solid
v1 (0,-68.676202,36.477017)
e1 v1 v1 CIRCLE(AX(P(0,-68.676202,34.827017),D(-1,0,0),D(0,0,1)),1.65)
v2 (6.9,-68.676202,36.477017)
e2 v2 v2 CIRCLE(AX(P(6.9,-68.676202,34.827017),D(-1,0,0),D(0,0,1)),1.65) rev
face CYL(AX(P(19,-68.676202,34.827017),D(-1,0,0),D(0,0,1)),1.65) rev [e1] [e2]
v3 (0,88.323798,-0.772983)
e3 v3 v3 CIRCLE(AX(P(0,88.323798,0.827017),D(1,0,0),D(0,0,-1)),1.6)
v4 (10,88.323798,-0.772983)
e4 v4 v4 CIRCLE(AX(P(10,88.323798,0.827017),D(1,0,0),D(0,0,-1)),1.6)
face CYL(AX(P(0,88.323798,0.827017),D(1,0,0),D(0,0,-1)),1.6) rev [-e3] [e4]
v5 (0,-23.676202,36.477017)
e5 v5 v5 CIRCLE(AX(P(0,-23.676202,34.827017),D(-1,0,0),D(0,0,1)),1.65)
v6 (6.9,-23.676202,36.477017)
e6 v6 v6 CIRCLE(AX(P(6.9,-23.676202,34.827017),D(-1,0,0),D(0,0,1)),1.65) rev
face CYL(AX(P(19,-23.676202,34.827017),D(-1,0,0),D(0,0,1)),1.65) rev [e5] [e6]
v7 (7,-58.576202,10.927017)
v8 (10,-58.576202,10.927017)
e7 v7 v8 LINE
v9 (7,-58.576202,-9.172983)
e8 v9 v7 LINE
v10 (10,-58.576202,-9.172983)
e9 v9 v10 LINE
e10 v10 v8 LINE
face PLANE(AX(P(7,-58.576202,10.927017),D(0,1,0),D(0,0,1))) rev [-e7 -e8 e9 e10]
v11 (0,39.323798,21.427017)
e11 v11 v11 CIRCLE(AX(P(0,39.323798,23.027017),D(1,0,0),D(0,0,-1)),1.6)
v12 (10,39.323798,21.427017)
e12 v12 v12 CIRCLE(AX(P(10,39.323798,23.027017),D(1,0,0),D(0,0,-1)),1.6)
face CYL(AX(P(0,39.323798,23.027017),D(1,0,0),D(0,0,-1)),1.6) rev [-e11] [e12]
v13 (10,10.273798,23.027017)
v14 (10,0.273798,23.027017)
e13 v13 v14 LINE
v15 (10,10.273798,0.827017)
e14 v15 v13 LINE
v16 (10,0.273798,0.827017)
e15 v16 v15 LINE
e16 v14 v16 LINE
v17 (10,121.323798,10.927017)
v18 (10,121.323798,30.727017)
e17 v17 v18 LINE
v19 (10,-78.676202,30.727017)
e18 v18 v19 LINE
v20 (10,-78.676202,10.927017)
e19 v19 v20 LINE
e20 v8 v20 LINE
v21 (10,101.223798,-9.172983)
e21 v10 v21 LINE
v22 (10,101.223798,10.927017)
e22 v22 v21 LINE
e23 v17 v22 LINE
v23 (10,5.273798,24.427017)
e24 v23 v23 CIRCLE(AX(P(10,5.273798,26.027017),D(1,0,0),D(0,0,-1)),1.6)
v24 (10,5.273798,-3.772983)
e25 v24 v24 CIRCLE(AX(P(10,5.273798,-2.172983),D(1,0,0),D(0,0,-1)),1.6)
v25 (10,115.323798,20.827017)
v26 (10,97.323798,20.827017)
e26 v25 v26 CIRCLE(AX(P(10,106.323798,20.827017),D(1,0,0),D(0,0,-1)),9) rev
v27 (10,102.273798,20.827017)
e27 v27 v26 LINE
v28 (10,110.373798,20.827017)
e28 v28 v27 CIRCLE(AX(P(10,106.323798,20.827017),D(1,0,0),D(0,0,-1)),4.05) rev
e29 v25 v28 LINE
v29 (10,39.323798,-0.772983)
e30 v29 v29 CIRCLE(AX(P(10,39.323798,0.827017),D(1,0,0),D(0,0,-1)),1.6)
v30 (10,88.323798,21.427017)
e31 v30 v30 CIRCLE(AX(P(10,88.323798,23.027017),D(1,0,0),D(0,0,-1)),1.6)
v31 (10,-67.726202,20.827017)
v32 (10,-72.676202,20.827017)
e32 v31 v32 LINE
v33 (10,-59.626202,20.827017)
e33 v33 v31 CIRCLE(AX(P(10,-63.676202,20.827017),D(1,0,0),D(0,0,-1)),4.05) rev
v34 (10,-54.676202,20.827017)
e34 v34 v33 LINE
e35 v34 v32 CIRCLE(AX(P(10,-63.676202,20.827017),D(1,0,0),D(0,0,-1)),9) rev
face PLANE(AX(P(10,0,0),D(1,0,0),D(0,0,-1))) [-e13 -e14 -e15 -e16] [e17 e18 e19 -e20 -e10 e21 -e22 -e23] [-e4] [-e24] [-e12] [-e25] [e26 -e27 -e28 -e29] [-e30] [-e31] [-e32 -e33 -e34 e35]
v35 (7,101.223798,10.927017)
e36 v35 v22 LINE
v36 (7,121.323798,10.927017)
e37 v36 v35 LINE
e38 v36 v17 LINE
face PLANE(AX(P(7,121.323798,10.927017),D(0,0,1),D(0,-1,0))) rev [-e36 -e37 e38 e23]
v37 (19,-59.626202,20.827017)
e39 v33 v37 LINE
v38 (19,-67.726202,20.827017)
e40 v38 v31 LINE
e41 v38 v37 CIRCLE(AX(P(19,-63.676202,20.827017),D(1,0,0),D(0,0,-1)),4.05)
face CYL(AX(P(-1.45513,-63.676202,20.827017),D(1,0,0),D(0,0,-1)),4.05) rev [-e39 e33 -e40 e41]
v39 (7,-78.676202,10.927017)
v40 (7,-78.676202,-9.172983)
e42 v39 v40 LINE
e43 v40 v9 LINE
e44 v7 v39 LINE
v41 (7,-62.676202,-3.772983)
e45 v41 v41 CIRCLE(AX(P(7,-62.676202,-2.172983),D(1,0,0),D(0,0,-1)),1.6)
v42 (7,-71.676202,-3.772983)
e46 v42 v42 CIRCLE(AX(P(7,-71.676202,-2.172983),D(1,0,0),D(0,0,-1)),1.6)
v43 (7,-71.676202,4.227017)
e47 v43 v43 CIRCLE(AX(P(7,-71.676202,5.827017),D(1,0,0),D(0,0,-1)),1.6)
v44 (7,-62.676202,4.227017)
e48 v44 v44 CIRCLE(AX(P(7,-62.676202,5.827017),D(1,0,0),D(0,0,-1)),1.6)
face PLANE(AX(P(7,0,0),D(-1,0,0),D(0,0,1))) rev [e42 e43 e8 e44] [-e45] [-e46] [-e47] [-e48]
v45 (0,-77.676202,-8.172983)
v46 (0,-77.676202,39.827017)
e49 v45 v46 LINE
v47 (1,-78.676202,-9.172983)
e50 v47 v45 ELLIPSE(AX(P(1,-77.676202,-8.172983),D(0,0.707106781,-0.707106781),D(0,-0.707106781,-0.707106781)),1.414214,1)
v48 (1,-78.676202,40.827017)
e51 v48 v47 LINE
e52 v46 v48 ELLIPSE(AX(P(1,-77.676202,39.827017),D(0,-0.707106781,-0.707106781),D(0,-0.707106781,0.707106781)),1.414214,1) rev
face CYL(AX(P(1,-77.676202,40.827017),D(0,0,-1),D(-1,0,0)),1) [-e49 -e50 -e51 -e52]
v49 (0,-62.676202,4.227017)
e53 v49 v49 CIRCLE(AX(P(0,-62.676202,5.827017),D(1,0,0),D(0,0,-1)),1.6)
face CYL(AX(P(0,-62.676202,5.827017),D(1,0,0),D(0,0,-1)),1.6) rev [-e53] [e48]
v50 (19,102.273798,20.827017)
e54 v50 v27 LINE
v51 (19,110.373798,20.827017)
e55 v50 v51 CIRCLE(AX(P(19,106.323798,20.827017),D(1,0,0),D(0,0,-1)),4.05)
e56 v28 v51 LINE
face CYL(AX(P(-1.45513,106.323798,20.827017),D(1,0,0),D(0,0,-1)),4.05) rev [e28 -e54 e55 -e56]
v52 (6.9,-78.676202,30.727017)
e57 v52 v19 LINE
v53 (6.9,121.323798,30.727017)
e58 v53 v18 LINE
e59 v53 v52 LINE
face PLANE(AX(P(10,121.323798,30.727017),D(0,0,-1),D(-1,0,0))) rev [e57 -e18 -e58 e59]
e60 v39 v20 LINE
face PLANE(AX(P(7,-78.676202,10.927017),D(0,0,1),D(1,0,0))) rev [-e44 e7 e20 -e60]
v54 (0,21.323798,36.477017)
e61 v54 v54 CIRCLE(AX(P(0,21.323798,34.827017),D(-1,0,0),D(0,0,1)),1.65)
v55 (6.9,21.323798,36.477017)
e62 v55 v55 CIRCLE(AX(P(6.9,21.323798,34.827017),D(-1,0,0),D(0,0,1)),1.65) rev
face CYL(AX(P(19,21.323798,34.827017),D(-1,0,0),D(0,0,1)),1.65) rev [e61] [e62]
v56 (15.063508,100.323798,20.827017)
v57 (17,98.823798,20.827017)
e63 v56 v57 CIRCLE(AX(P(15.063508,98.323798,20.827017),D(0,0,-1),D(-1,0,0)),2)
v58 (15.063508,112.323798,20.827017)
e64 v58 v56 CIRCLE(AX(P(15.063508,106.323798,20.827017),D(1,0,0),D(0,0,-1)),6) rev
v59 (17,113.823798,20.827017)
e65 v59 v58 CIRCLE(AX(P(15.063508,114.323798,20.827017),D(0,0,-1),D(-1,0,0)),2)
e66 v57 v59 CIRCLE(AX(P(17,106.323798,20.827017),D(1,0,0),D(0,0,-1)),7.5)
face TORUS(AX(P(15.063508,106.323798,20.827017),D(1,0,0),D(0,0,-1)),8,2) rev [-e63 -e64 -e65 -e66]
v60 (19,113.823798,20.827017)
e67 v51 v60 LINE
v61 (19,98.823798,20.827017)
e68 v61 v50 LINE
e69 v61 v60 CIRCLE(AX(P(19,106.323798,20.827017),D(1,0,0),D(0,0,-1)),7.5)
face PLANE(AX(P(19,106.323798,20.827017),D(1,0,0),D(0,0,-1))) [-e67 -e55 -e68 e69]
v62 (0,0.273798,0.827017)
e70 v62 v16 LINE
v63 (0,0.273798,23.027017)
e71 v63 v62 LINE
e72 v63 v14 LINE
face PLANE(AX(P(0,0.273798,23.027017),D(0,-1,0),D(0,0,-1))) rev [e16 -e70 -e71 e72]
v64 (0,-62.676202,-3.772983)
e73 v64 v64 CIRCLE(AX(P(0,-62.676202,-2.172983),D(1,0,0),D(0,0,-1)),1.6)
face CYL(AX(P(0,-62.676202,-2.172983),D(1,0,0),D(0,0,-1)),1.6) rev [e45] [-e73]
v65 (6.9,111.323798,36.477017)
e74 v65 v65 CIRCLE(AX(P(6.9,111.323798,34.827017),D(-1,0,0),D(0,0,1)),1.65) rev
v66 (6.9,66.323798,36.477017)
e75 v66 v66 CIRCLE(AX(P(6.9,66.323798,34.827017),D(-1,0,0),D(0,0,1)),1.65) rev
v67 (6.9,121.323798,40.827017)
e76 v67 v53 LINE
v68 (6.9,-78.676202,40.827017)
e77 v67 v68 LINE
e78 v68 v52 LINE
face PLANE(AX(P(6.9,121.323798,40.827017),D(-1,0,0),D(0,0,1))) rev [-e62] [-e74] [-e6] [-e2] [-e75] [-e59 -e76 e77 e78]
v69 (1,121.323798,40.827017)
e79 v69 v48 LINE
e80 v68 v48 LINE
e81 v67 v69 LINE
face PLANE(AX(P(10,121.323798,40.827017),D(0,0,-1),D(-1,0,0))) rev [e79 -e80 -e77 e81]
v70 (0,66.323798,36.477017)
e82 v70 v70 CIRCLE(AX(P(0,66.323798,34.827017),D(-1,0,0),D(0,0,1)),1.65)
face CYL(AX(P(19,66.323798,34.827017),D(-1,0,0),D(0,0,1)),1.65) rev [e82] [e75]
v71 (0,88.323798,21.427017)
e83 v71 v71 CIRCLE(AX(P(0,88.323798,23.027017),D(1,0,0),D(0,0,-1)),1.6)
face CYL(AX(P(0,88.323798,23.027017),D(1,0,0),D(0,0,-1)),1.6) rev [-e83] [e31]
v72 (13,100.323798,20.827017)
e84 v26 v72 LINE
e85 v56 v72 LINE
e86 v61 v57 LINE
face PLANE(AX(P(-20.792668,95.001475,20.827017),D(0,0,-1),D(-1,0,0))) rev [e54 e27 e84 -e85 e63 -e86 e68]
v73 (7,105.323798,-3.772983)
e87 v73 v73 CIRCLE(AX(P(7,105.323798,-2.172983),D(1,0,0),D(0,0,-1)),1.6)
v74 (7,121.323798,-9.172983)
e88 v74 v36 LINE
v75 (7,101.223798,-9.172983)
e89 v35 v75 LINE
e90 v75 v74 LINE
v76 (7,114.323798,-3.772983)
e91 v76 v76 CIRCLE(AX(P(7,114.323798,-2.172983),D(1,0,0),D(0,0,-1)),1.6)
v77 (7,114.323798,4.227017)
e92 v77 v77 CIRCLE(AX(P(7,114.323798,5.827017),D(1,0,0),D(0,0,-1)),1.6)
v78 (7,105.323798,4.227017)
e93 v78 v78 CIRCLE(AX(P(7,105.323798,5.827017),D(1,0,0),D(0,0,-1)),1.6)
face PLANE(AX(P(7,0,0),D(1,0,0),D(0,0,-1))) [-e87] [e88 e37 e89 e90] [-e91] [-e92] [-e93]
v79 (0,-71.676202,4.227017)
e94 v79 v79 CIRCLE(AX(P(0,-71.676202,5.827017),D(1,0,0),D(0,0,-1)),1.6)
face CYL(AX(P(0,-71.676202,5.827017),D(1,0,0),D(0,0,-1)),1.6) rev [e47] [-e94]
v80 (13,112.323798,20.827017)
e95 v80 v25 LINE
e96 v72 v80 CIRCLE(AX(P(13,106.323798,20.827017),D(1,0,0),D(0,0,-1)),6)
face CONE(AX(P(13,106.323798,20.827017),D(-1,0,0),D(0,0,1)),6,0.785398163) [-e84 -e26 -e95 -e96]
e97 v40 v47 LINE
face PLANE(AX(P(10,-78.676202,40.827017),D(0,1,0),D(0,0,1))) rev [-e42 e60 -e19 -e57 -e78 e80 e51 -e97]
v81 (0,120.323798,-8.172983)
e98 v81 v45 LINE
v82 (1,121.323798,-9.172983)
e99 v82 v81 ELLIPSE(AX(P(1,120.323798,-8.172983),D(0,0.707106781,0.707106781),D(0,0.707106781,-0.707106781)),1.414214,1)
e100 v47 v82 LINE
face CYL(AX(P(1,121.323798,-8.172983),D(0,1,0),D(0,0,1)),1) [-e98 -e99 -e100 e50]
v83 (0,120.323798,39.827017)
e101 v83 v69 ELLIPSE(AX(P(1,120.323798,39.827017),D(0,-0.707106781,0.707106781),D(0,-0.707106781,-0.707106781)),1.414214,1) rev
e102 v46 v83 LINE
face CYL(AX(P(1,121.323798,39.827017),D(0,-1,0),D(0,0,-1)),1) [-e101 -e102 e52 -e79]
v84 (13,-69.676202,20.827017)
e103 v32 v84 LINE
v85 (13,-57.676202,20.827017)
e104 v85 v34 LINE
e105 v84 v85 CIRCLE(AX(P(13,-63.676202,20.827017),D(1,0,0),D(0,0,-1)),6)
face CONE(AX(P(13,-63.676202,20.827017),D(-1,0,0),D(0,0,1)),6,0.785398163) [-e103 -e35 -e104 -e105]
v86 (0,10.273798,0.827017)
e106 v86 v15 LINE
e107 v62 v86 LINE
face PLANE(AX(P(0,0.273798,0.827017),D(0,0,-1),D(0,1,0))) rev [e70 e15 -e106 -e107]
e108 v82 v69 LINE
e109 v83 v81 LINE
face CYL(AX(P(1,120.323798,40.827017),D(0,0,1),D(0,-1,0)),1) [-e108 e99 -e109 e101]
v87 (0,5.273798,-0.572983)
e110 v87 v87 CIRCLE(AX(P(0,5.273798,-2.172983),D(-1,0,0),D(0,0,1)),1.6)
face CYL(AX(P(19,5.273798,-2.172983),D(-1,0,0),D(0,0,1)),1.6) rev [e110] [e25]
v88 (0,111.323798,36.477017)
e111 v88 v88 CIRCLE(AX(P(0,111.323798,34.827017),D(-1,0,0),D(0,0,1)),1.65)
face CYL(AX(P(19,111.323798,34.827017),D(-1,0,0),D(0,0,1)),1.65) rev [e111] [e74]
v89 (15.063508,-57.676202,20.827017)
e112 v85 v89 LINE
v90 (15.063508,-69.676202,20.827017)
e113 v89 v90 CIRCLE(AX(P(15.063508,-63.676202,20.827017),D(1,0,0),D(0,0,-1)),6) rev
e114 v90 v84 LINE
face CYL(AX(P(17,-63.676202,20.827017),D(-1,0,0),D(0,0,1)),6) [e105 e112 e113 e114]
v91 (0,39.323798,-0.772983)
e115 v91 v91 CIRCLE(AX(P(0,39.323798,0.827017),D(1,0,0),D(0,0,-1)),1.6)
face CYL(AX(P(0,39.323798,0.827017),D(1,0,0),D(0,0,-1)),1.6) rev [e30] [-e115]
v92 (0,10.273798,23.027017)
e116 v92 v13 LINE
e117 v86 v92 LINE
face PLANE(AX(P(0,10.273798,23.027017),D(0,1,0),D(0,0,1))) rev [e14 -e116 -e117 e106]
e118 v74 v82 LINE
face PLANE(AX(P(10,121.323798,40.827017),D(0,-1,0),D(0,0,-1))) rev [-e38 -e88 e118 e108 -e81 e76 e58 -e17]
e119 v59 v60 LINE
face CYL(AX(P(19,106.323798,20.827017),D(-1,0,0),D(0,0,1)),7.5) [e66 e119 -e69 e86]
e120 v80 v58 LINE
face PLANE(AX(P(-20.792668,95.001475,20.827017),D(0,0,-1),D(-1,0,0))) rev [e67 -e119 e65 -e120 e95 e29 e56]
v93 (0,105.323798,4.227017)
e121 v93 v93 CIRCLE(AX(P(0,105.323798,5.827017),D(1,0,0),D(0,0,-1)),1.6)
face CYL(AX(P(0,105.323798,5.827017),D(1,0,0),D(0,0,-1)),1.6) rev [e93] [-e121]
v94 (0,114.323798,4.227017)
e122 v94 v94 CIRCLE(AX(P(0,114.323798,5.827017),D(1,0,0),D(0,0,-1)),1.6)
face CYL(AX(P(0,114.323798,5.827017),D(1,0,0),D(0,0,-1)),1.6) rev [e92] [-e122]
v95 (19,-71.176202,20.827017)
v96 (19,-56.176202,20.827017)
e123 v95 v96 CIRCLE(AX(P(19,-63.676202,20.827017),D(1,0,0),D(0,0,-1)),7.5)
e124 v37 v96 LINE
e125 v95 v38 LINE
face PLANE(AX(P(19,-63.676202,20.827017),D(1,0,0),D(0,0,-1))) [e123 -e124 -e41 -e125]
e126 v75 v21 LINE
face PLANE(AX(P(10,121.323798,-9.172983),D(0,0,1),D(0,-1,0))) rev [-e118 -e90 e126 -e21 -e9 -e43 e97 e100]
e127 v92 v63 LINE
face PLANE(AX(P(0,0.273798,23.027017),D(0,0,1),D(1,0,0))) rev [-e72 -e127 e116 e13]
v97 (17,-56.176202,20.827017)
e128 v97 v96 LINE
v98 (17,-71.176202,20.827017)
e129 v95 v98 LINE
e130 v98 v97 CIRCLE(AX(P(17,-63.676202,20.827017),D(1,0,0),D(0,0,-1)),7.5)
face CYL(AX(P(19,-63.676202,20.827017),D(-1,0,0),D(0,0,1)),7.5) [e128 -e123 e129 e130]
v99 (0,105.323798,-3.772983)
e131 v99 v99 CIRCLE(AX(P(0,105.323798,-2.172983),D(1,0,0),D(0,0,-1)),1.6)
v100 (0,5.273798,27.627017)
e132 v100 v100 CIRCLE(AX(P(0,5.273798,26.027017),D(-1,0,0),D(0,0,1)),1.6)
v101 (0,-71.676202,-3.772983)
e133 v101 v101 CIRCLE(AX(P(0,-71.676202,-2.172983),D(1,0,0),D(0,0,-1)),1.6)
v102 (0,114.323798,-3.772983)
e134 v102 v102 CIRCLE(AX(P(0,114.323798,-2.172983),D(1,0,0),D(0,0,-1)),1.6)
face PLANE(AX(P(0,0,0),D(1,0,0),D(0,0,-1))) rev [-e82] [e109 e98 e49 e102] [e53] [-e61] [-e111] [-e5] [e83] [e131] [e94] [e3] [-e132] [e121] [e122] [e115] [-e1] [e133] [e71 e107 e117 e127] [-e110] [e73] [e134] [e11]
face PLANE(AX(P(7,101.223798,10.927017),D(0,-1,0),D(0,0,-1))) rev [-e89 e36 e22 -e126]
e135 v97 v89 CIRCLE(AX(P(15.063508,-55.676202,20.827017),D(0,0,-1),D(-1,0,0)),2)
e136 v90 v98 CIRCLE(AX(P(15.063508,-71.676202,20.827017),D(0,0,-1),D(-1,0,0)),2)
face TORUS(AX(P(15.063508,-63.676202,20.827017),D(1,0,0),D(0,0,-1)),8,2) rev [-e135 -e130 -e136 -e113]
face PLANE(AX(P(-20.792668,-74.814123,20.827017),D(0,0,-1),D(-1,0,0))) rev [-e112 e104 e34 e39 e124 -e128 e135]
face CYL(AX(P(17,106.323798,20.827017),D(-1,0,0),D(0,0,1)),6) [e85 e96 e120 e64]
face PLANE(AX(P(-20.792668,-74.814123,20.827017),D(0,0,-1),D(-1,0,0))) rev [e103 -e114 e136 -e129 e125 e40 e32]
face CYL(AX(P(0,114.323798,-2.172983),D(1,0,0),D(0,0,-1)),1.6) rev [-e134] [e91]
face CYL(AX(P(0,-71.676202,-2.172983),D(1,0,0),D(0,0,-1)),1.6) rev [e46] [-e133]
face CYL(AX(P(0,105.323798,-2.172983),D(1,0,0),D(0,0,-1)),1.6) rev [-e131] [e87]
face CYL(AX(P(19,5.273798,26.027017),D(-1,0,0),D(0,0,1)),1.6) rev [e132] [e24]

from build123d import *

# Parameters (mm, degrees)
SKETCH2_W           = 50
SKETCH2_H           = 200
BOSS_EXTRUDE2_DEPTH = 10
SKETCH4_R           = 6
BOSS_EXTRUDE3_DEPTH = 7
SKETCH5_R           = 7.5
BOSS_EXTRUDE4_DEPTH = 2
SKETCH8_W           = 20.1
SKETCH8_H           = 20.1
CUT_EXTRUDE4_DEPTH  = 3
SKETCH9_R           = 1.6
CUT_EXTRUDE5_DEPTH  = 129.570250184
CUT_EXTRUDE8_REACH  = 131.411
SKETCH10_W          = 20
SKETCH10_H          = 23.413423022
SKETCH10_H_2        = 20.071314626
SKETCH11_R          = 4.05
CUT_EXTRUDE9_DEPTH  = 9
SKETCH12_R          = 1.6
CUT_EXTRUDE10_DEPTH = 129.399023487
FILLET2_R           = 2
FILLET3_R           = 1
CHAMFER1_SIZE       = 3
SKETCH14_R          = 1.65
CUT_EXTRUDE12_DEPTH = 130.411395296
SKETCH15_W          = 3.1
SKETCH15_H          = 10.1
CUT_EXTRUDE13_DEPTH = 206.006939607
SKETCH16_W          = 22.2
SKETCH16_H          = 10
CUT_EXTRUDE14_DEPTH = 10
SKETCH17_R          = 1.6
CUT_EXTRUDE15_DEPTH = 130.411395296
SKETCH18_R          = 1.6
CUT_EXTRUDE16_DEPTH = 129.570250184
SKETCH19_R          = 1.6
CUT_EXTRUDE17_DEPTH = 129.570250184


with BuildPart() as part:
    # Sketch2 → Boss-Extrude2 (new body)
    with BuildSketch(Plane(origin=(0, 0, 0), x_dir=(0, 0, -1), z_dir=(1, 0, 0))):
        with Locations((-15.827016632, 21.323797935)):
            Rectangle(SKETCH2_W, SKETCH2_H)
    extrude(amount=BOSS_EXTRUDE2_DEPTH)

    # Sketch4 → Boss-Extrude3 (add)
    with BuildSketch(Plane(origin=(10, 0, 0), x_dir=(0, 0, -1), z_dir=(1, 0, 0))):
        with Locations((-20.827016632, 106.323797935)):
            Circle(SKETCH4_R)
        with Locations((-20.827016632, -63.676202065)):
            Circle(SKETCH4_R)
    extrude(amount=BOSS_EXTRUDE3_DEPTH)

    # Sketch5 → Boss-Extrude4 (add)
    with BuildSketch(Plane(origin=(17, 0, 0), x_dir=(0, 0, -1), z_dir=(1, 0, 0))):
        with Locations((-20.827016632, -63.676202065)):
            Circle(SKETCH5_R)
        with Locations((-20.827016632, 106.323797935)):
            Circle(SKETCH5_R)
    extrude(amount=BOSS_EXTRUDE4_DEPTH)

    # Sketch8 → Cut-Extrude4 (cut)
    with BuildSketch(Plane(origin=(10, 0, 0), x_dir=(0, 0, -1), z_dir=(1, 0, 0))):
        with Locations((-0.877016632, -68.626202065)):
            Rectangle(SKETCH8_W, SKETCH8_H)
        with Locations((-0.877016632, 111.273797935)):
            Rectangle(SKETCH8_W, SKETCH8_H)
    extrude(amount=-CUT_EXTRUDE4_DEPTH, mode=Mode.SUBTRACT)

    # Sketch9 → Cut-Extrude5 (cut, through all)
    with BuildSketch(Plane(origin=(7, 0, 0), x_dir=(0, 0, -1), z_dir=(1, 0, 0))):
        with Locations((-5.827016632, 114.323797935)):
            Circle(SKETCH9_R)
        with Locations((2.172983368, 105.323797935)):
            Circle(SKETCH9_R)
        with Locations((2.172983368, 114.323797935)):
            Circle(SKETCH9_R)
        with Locations((-5.827016632, -71.676202065)):
            Circle(SKETCH9_R)
        with Locations((2.172983368, -62.676202065)):
            Circle(SKETCH9_R)
        with Locations((2.172983368, -71.676202065)):
            Circle(SKETCH9_R)
    extrude(amount=-CUT_EXTRUDE5_DEPTH, mode=Mode.SUBTRACT)

    # Cut-Extrude8: up to this face of the body (flat: up to its plane)
    cut_extrude8_end = Plane(part.part.faces().sort_by_distance((10, 21.323797935, 17.048206438))[0])
    # Sketch10 → Cut-Extrude8 (cut, up to the picked face)
    with BuildSketch(Plane(origin=(19, 0, 0), x_dir=(0, 0, -1), z_dir=(1, 0, 0)), mode=Mode.PRIVATE) as cut_extrude8_sk1:
        with Locations((-30.827016632, -63.1074113)):
            Rectangle(SKETCH10_W, SKETCH10_H)
    cut_extrude8_tool1 = split(extrude(cut_extrude8_sk1.sketch, amount=-CUT_EXTRUDE8_REACH, mode=Mode.PRIVATE), bisect_by=cut_extrude8_end, keep=Keep.BOTH, mode=Mode.PRIVATE)
    # Sketch10 → Cut-Extrude8 (cut, up to the picked face)
    with BuildSketch(Plane(origin=(19, 0, 0), x_dir=(0, 0, -1), z_dir=(1, 0, 0)), mode=Mode.PRIVATE) as cut_extrude8_sk2:
        with Locations((-30.827016632, 105.037131871)):
            Rectangle(SKETCH10_W, SKETCH10_H_2)
    cut_extrude8_tool2 = split(extrude(cut_extrude8_sk2.sketch, amount=-CUT_EXTRUDE8_REACH, mode=Mode.PRIVATE), bisect_by=cut_extrude8_end, keep=Keep.BOTH, mode=Mode.PRIVATE)
    add(cut_extrude8_tool1.solids().sort_by(Axis((19, -63.107411, 30.827017), (-1, 0, 0)))[0], mode=Mode.SUBTRACT)
    add(cut_extrude8_tool2.solids().sort_by(Axis((19, 105.037132, 30.827017), (-1, 0, 0)))[0], mode=Mode.SUBTRACT)

    # Sketch11 → Cut-Extrude9 (cut)
    with BuildSketch(Plane(origin=(19, 0, 0), x_dir=(0, 0, -1), z_dir=(1, 0, 0))):
        with Locations((-20.827016632, -63.676202065)):
            Circle(SKETCH11_R)
        with Locations((-20.827016632, 106.323797935)):
            Circle(SKETCH11_R)
    extrude(amount=-CUT_EXTRUDE9_DEPTH, mode=Mode.SUBTRACT)

    # Sketch12 → Cut-Extrude10 (cut, through all)
    with BuildSketch(Plane(origin=(10, 0, 0), x_dir=(0, 0, -1), z_dir=(1, 0, 0))):
        with Locations((-23.027016632, 39.323797935)):
            Circle(SKETCH12_R)
        with Locations((-23.027016632, 88.323797935)):
            Circle(SKETCH12_R)
        with Locations((-0.827016632, 88.323797935)):
            Circle(SKETCH12_R)
        with Locations((-0.827016632, 39.323797935)):
            Circle(SKETCH12_R)
    extrude(amount=-CUT_EXTRUDE10_DEPTH, mode=Mode.SUBTRACT)

    # Fillet2
    # the kernel refuses this fillet: 2 mm, written as the material it adds along each edge
    with BuildSketch(Plane(origin=(17, 106.323797935, 20.827016632), x_dir=(0, 1, 0), z_dir=(0, 0, 1))) as fillet2_piece_1:
        with BuildLine():
            CenterArc((8, 1.936491673), FILLET2_R, 180, 75.522487814)
            Line((7.5, 0), (7.49, -0.038729833))
            ThreePointArc((7.49, -0.038729833), (6.75, -0.04), (6, -0.04))
            Line((6, -0.04), (5.96, 0))
            Line((5.96, 0), (5.96, 1.936491673))
            Line((5.96, 1.936491673), (6, 1.936491673))
        make_face()
    revolve(axis=Axis((17, 106.323797935, 20.827016632), (-1, 0, 0)), revolution_arc=180)
    with BuildSketch(Plane(origin=(17, -63.676202065, 20.827016632), x_dir=(0, -1, 0), z_dir=(0, 0, 1))) as fillet2_piece_2:
        with BuildLine():
            CenterArc((8, -1.936491673), FILLET2_R, 104.477512186, 75.522487814)
            Line((6, -1.936491673), (5.96, -1.936491673))
            Line((5.96, -1.936491673), (5.96, 0))
            Line((5.96, 0), (6, 0.04))
            ThreePointArc((6, 0.04), (6.75, 0.04), (7.49, 0.038729833))
            Line((7.49, 0.038729833), (7.5, 0))
        make_face()
    revolve(axis=Axis((17, -63.676202065, 20.827016632), (1, 0, 0)), revolution_arc=180)

    # Fillet3
    fillet3_edges = [part.edges().sort_by_distance(p)[0] for p in [
        (0, 121.323797935, 15.827016632),
        (0, 21.323797935, -9.172983368),
        (0, -78.676202065, 15.827016632),
        (0, 21.323797935, 40.827016632),
    ]]
    fillet(fillet3_edges, radius=FILLET3_R)

    # Chamfer1
    chamfer1_edges = [part.edges().sort_by_distance(p)[0] for p in [
        (10, -63.676202065, 14.827016632),
        (10, 106.323797935, 14.827016632),
    ]]
    chamfer(chamfer1_edges, length=CHAMFER1_SIZE)

    # Sketch14 → Cut-Extrude12 (cut, through all)
    with BuildSketch(Plane.ZY):
        with Locations((34.827016632, 111.323797935)):
            Circle(SKETCH14_R)
        with Locations((34.827016632, 66.323797935)):
            Circle(SKETCH14_R)
        with Locations((34.827016632, 21.323797935)):
            Circle(SKETCH14_R)
        with Locations((34.827016632, -23.676202065)):
            Circle(SKETCH14_R)
        with Locations((34.827016632, -68.676202065)):
            Circle(SKETCH14_R)
    extrude(amount=-CUT_EXTRUDE12_DEPTH, mode=Mode.SUBTRACT)

    # Sketch15 → Cut-Extrude13 (cut, through all)
    with BuildSketch(Plane.XZ.offset(78.676202065)):
        with Locations((8.45, 35.777016632)):
            Rectangle(SKETCH15_W, SKETCH15_H)
    extrude(amount=-CUT_EXTRUDE13_DEPTH, mode=Mode.SUBTRACT)

    # Sketch16 → Cut-Extrude14 (cut)
    with BuildSketch(Plane(origin=(10, 0, 0), x_dir=(0, 0, -1), z_dir=(1, 0, 0))):
        with Locations((-11.927016632, 5.273797935)):
            Rectangle(SKETCH16_W, SKETCH16_H)
    extrude(amount=-CUT_EXTRUDE14_DEPTH, mode=Mode.SUBTRACT)

    # Sketch17 → Cut-Extrude15 (cut, through all)
    with BuildSketch(Plane.ZY):
        with Locations((26.027016632, 5.273797935)):
            Circle(SKETCH17_R)
        with Locations((-2.172983368, 5.273797935)):
            Circle(SKETCH17_R)
    extrude(amount=-CUT_EXTRUDE15_DEPTH, mode=Mode.SUBTRACT)

    # Sketch18 → Cut-Extrude16 (cut, through all)
    with BuildSketch(Plane(origin=(7, 0, 0), x_dir=(0, 0, -1), z_dir=(1, 0, 0))):
        with Locations((-5.827016632, -62.676202065)):
            Circle(SKETCH18_R)
    extrude(amount=-CUT_EXTRUDE16_DEPTH, mode=Mode.SUBTRACT)

    # Sketch19 → Cut-Extrude17 (cut, through all)
    with BuildSketch(Plane(origin=(7, 0, 0), x_dir=(0, 0, -1), z_dir=(1, 0, 0))):
        with Locations((-5.827016632, 105.323797935)):
            Circle(SKETCH19_R)
    extrude(amount=-CUT_EXTRUDE17_DEPTH, mode=Mode.SUBTRACT)


solid = part.part
